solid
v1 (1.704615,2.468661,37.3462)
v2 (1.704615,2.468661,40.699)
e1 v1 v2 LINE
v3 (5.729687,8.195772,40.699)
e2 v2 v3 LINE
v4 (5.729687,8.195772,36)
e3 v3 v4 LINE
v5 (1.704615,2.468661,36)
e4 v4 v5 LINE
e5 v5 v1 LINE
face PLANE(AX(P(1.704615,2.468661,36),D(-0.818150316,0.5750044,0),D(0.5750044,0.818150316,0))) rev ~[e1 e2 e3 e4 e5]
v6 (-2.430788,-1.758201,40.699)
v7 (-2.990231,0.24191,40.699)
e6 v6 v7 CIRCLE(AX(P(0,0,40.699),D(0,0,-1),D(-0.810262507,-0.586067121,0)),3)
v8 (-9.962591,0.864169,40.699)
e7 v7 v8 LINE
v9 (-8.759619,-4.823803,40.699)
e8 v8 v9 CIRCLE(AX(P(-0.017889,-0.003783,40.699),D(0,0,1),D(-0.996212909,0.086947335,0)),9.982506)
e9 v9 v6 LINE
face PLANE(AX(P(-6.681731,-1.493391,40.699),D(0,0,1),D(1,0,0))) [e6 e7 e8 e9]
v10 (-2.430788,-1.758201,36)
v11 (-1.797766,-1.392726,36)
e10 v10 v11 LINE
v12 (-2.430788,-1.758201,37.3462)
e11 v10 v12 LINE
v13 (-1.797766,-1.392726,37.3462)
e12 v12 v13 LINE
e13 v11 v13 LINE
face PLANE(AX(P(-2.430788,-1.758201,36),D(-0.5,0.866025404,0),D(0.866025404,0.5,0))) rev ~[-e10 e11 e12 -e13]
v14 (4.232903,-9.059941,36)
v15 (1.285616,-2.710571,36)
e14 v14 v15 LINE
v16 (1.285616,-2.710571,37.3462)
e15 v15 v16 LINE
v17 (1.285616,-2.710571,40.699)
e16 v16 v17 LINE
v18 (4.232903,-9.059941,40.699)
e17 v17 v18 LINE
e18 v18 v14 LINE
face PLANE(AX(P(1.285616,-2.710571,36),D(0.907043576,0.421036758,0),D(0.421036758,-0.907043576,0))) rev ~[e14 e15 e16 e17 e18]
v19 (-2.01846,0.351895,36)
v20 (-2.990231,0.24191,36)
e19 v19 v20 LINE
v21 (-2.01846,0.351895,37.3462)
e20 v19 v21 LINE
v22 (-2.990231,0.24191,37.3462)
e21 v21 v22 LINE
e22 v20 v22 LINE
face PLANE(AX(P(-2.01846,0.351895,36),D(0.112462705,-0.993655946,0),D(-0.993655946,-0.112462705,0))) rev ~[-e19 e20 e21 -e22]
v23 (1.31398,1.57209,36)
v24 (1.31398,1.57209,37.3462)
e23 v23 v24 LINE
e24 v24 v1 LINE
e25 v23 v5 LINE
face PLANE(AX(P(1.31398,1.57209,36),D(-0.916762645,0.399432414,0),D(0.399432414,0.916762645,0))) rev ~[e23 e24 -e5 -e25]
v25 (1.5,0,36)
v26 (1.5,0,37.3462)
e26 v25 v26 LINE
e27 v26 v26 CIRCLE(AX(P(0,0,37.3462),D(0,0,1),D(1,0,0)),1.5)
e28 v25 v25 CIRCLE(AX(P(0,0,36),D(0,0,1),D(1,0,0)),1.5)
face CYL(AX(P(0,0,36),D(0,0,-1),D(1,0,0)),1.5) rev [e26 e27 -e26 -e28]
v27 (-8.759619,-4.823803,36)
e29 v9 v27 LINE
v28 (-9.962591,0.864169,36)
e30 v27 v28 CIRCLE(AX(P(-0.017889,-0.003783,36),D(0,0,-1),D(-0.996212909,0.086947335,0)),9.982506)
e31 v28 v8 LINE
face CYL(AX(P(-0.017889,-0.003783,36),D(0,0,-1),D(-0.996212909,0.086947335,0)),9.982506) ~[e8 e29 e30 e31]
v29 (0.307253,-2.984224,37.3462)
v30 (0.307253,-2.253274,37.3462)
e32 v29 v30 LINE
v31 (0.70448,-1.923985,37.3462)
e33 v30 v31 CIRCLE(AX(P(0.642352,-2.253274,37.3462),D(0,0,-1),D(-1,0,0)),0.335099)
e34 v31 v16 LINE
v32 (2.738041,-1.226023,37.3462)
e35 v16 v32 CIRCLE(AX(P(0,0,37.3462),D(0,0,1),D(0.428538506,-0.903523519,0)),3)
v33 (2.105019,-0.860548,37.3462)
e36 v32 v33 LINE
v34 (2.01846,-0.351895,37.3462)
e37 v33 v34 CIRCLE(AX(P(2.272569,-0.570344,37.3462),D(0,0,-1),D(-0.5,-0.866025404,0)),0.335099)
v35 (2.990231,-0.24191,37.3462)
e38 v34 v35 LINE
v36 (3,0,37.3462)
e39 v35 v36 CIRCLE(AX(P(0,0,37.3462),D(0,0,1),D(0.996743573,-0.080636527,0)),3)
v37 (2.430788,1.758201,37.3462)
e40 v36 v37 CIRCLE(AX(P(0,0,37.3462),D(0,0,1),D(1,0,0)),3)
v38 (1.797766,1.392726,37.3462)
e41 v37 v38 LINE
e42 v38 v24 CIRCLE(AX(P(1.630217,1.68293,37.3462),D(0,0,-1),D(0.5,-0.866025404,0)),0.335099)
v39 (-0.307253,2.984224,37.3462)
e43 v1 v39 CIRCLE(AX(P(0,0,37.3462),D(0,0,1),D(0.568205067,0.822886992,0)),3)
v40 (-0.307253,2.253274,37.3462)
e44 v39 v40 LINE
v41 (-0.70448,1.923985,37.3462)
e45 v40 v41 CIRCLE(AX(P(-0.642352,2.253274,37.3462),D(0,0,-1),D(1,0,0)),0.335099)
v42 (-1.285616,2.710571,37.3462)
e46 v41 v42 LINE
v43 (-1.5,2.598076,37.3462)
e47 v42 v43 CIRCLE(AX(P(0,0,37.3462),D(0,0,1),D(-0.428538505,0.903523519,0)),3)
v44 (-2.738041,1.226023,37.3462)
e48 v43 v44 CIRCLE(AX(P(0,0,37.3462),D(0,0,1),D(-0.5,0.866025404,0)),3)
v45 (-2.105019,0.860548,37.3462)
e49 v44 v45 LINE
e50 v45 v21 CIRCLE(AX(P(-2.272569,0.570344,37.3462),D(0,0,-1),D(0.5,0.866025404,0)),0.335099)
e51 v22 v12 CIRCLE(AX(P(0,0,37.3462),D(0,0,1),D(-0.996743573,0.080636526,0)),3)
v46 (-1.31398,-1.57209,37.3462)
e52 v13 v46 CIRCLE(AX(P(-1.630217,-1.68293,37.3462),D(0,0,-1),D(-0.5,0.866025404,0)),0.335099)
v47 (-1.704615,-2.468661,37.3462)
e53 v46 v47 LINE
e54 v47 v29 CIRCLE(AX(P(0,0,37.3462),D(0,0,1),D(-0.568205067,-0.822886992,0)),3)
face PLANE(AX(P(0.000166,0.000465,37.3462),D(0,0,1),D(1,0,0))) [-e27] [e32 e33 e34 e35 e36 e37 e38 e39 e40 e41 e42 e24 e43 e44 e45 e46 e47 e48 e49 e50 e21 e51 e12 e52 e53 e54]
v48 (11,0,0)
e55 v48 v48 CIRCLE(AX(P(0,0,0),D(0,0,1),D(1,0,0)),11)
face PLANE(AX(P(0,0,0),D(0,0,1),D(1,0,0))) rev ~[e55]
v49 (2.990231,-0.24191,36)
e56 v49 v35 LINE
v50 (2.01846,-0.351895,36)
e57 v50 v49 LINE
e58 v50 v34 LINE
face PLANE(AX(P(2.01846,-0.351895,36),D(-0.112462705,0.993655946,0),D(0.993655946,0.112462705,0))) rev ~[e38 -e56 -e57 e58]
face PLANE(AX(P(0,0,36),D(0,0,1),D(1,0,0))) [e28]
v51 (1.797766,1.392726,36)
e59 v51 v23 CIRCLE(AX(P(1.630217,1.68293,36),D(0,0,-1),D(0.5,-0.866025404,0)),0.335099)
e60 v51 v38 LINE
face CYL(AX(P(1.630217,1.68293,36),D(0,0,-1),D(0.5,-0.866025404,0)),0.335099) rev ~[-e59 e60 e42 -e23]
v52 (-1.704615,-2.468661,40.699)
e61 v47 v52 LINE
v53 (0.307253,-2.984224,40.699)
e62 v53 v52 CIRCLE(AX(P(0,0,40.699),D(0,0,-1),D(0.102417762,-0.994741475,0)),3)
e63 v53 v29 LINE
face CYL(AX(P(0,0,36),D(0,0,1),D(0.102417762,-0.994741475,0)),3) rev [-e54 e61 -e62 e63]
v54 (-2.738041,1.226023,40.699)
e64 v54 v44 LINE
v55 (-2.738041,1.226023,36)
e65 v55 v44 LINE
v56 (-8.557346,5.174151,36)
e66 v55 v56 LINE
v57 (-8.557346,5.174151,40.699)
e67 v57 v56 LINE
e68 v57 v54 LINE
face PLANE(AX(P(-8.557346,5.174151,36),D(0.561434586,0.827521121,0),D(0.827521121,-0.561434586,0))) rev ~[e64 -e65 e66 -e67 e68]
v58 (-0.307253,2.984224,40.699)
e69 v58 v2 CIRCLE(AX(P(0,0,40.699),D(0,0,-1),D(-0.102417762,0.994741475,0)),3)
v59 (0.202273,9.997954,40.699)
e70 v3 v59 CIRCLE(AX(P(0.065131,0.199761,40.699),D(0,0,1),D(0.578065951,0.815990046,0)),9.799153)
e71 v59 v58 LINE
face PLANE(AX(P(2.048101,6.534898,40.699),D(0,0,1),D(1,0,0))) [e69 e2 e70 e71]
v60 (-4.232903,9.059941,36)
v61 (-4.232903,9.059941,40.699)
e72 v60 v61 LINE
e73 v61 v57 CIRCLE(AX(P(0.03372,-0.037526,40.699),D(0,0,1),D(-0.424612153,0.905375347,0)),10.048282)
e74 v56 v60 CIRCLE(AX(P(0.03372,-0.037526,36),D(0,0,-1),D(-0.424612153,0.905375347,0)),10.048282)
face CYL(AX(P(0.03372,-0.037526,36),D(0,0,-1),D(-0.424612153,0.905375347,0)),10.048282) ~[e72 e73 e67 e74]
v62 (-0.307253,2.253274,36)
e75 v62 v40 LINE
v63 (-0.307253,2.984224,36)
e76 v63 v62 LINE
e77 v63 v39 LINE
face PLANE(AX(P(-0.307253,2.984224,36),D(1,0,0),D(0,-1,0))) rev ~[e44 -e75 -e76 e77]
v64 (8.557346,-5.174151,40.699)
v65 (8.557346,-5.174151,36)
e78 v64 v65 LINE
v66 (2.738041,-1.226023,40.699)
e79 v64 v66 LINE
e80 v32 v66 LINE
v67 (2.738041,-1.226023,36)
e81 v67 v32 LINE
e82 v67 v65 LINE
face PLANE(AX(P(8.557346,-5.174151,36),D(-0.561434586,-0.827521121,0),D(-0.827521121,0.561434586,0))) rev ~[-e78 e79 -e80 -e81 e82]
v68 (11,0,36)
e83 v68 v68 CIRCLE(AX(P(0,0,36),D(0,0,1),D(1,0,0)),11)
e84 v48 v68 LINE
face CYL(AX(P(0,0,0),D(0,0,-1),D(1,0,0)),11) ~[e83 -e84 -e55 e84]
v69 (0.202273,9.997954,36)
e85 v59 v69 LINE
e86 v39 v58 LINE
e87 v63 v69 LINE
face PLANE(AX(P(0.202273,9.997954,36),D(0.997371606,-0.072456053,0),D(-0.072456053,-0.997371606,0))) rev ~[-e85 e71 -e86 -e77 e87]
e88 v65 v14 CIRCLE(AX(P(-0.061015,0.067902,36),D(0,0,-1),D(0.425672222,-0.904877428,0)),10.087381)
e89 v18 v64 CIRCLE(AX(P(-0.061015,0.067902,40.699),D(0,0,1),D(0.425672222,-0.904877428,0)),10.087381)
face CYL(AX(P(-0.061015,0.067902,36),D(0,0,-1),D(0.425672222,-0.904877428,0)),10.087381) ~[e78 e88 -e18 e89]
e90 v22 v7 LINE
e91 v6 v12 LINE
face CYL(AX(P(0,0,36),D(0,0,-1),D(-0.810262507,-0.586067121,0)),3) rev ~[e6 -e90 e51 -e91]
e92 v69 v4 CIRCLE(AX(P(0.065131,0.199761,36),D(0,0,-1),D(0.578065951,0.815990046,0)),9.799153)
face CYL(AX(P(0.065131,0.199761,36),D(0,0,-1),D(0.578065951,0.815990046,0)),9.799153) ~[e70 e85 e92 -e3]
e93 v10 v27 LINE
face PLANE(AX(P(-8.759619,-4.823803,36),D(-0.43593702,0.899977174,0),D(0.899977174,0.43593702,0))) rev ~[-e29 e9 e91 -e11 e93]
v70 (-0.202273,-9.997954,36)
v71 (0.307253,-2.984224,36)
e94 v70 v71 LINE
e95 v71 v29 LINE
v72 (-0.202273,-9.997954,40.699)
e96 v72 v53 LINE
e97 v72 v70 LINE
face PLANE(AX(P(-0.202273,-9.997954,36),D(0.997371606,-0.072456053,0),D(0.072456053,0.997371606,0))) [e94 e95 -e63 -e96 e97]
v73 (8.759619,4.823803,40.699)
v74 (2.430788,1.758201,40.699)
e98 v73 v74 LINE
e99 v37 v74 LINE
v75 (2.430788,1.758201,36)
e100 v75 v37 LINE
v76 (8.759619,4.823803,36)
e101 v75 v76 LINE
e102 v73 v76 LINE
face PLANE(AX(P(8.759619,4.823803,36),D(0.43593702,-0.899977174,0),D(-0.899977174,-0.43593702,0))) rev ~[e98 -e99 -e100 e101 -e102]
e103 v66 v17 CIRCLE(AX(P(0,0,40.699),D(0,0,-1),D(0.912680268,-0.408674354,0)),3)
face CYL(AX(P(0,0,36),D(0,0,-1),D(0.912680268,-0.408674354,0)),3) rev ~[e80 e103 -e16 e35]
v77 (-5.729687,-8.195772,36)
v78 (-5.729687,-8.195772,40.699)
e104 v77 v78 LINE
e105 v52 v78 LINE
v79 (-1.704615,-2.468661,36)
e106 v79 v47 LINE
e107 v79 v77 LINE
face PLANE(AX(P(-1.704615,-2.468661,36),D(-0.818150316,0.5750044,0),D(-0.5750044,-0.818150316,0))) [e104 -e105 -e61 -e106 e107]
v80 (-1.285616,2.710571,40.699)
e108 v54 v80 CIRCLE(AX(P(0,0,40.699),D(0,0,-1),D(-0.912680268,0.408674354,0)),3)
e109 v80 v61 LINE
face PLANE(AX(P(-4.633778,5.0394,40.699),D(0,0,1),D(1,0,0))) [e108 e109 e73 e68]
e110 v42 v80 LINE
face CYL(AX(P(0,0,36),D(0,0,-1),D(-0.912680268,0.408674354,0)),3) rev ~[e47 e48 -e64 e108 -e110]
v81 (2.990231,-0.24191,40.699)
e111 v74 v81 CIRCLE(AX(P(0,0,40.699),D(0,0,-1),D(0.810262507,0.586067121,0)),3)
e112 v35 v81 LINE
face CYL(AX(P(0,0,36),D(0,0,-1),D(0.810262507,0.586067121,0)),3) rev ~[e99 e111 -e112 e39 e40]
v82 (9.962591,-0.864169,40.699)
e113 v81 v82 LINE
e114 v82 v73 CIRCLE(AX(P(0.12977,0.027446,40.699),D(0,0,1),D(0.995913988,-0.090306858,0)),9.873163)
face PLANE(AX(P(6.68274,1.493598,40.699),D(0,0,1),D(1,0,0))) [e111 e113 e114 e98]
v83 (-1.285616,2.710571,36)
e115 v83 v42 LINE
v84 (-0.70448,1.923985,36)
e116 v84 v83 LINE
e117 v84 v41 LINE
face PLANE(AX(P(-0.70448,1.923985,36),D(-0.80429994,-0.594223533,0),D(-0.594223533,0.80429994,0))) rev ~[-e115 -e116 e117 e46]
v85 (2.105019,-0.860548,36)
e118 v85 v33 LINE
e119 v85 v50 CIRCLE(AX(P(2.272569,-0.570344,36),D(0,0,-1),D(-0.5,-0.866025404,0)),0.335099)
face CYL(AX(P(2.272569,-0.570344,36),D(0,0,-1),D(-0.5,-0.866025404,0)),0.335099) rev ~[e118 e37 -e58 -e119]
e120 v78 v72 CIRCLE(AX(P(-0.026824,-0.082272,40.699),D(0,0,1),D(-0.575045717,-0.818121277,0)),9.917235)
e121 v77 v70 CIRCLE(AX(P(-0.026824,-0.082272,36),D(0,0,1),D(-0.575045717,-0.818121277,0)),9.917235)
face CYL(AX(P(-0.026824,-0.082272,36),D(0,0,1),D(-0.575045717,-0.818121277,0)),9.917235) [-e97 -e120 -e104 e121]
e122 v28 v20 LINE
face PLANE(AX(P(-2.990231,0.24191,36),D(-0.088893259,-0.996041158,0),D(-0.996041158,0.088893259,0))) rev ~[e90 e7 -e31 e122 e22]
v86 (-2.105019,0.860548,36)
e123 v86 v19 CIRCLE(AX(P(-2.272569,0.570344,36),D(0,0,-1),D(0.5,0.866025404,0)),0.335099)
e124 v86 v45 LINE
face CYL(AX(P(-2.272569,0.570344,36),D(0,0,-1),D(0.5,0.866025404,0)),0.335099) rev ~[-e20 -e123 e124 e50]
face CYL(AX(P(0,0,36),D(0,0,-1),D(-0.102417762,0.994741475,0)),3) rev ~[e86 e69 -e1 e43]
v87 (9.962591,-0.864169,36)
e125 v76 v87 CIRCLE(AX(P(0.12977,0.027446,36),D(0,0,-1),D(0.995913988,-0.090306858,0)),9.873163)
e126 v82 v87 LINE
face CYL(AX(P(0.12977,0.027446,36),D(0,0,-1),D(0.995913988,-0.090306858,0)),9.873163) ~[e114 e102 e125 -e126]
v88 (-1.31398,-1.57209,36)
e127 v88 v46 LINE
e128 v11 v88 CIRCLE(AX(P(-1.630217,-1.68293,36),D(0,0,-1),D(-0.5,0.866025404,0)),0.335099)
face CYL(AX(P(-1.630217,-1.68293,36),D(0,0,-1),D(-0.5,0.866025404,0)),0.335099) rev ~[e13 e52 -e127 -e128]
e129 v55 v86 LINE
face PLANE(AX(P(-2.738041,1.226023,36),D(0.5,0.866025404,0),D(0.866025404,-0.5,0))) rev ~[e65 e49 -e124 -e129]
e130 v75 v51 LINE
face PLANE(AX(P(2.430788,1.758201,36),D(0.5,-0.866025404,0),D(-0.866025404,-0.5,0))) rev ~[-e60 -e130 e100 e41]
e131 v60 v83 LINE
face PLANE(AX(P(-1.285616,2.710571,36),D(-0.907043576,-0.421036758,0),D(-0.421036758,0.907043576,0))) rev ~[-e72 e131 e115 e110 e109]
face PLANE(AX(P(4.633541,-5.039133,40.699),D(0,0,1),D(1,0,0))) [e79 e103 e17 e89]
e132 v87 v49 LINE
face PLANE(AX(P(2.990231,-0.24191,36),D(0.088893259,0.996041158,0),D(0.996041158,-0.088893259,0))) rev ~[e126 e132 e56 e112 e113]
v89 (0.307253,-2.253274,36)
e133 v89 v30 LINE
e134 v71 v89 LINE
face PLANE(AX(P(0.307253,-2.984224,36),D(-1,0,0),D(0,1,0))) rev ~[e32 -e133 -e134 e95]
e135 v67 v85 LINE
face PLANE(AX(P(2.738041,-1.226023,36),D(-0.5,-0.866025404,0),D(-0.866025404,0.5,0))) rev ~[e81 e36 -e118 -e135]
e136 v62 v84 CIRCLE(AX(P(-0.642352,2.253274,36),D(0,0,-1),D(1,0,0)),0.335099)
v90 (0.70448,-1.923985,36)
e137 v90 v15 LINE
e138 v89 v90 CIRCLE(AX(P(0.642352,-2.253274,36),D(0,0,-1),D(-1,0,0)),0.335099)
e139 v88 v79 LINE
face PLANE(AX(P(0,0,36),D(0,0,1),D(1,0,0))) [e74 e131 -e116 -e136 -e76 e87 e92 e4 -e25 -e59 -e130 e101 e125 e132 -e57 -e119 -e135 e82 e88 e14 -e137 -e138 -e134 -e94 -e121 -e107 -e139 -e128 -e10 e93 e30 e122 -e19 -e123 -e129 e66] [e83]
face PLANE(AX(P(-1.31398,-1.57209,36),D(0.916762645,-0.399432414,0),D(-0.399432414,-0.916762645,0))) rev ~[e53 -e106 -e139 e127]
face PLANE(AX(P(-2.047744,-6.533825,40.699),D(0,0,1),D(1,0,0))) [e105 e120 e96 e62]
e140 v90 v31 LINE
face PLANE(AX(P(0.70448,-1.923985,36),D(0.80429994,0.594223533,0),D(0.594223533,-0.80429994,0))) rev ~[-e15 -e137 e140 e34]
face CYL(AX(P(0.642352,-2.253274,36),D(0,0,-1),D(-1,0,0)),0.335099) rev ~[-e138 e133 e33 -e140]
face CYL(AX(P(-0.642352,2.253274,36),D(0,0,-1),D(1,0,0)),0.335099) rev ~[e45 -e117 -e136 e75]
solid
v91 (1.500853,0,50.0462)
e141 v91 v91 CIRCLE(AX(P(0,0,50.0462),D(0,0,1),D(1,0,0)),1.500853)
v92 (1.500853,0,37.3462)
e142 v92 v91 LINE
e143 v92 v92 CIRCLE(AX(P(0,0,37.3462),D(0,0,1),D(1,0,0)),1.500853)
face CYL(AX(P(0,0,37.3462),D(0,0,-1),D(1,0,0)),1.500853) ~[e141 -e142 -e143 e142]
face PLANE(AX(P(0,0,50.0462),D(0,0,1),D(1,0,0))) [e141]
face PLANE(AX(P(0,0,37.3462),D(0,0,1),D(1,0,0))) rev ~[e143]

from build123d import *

# Parameters (mm, degrees)
F0_R     = 11
F1_DEPTH = 36
F2_R     = 1.5
F3_DEPTH = 1.3462
F5_R     = 1.5008527343
F6_DEPTH = 12.7
F8_DEPTH = 4.699


with BuildPart() as f1:
    # F0 (on Top) → F1 (new body)
    with BuildSketch(Plane.XY):
        Circle(F0_R)
    extrude(amount=F1_DEPTH)

    # F2 (on face) → F3 (join)
    with BuildSketch(Plane.XY.offset(36)):
        with BuildLine():
            ThreePointArc((1.7046152007, 2.4686609766), (0.7447190731, 2.906095921), (-0.3072532854, 2.984224425))
            Line((-0.3072532854, 2.984224425), (-0.3072532854, 2.2532741809))
            ThreePointArc((-0.3072532854, 2.2532741809), (-0.4284919948, 1.9952916114), (-0.704479753, 1.9239853136))
            Line((-0.704479753, 1.9239853136), (-1.2856155187, 2.7105705558))
            ThreePointArc((-1.2856155187, 2.7105705558), (-1.3939430401, 2.6564869285), (-1.5, 2.5980762114))
            ThreePointArc((-1.5, 2.5980762114), (-2.2273032861, 2.009756222), (-2.7380408053, 1.2260230619))
            Line((-2.7380408053, 1.2260230619), (-2.105019325, 0.8605479398))
            ThreePointArc((-2.105019325, 0.8605479398), (-1.9422192208, 0.6265608529), (-2.0184600346, 0.3518952942))
            Line((-2.0184600346, 0.3518952942), (-2.9902307194, 0.2419095792))
            ThreePointArc((-2.9902307194, 0.2419095792), (-2.88911243, -0.8081023245), (-2.4307875199, -1.7582013631))
            Line((-2.4307875199, -1.7582013631), (-1.7977660396, -1.392726241))
            ThreePointArc((-1.7977660396, -1.392726241), (-1.513727226, -1.3687307585), (-1.3139802816, -1.5720900194))
            Line((-1.3139802816, -1.5720900194), (-1.7046152007, -2.4686609766))
            ThreePointArc((-1.7046152007, -2.4686609766), (-0.7447190731, -2.906095921), (0.3072532854, -2.984224425))
            Line((0.3072532854, -2.984224425), (0.3072532854, -2.2532741809))
            ThreePointArc((0.3072532854, -2.2532741809), (0.4284919948, -1.9952916114), (0.704479753, -1.9239853136))
            Line((0.704479753, -1.9239853136), (1.2856155187, -2.7105705558))
            ThreePointArc((1.2856155187, -2.7105705558), (2.1443933569, -2.0979935965), (2.7380408053, -1.2260230619))
            Line((2.7380408053, -1.2260230619), (2.105019325, -0.8605479398))
            ThreePointArc((2.105019325, -0.8605479398), (1.9422192208, -0.6265608529), (2.0184600346, -0.3518952942))
            Line((2.0184600346, -0.3518952942), (2.9902307194, -0.2419095792))
            ThreePointArc((2.9902307194, -0.2419095792), (2.9975566849, -0.1210533801), (3, 0))
            ThreePointArc((3, 0), (2.8541515867, 0.9240231167), (2.4307875199, 1.7582013631))
            Line((2.4307875199, 1.7582013631), (1.7977660396, 1.392726241))
            ThreePointArc((1.7977660396, 1.392726241), (1.513727226, 1.3687307585), (1.3139802816, 1.5720900194))
            Line((1.3139802816, 1.5720900194), (1.7046152007, 2.4686609766))
        make_face()
        Circle(F2_R, mode=Mode.SUBTRACT)
    extrude(amount=F3_DEPTH)

    # F7 (on face) → F8 (join, symmetric)
    with BuildSketch(Plane.XY.offset(36)):
        with BuildLine():
            ThreePointArc((-2.4307875199, -1.7582013631), (-2.88911243, -0.8081023245), (-2.9902307194, 0.2419095792))
            Line((-2.9902307194, 0.2419095792), (-9.9625906409, 0.8641688039))
            ThreePointArc((-9.9625906409, 0.8641688039), (-9.7843590309, -2.0693330281), (-8.7596187693, -4.8238033766))
            Line((-8.7596187693, -4.8238033766), (-2.4307875199, -1.7582013631))
        make_face()
        with BuildLine():
            Line((0.2022731176, 9.99795407), (-0.3072532854, 2.984224425))
            ThreePointArc((-0.3072532854, 2.984224425), (0.7447190731, 2.906095921), (1.7046152007, 2.4686609766))
            Line((1.7046152007, 2.4686609766), (5.7296874578, 8.1957721806))
            ThreePointArc((5.7296874578, 8.1957721806), (3.1027108725, 9.5162251218), (0.2022731176, 9.99795407))
        make_face()
        with BuildLine():
            Line((8.7596187693, 4.8238033766), (2.4307875199, 1.7582013631))
            ThreePointArc((2.4307875199, 1.7582013631), (2.88911243, 0.8081023245), (2.9902307194, -0.2419095792))
            Line((2.9902307194, -0.2419095792), (9.9625906409, -0.8641688039))
            ThreePointArc((9.9625906409, -0.8641688039), (9.7892625878, 2.0703701008), (8.7596187693, 4.8238033766))
        make_face()
        with BuildLine():
            Line((8.5573456517, -5.1741506934), (2.7380408053, -1.2260230619))
            ThreePointArc((2.7380408053, -1.2260230619), (2.1443933569, -2.0979935965), (1.2856155187, -2.7105705558))
            Line((1.2856155187, -2.7105705558), (4.2329031831, -9.0599409845))
            ThreePointArc((4.2329031831, -9.0599409845), (6.6811343516, -7.4353423534), (8.5573456517, -5.1741506934))
        make_face()
        with BuildLine():
            ThreePointArc((-2.7380408053, 1.2260230619), (-2.1443933569, 2.0979935965), (-1.2856155187, 2.7105705558))
            Line((-1.2856155187, 2.7105705558), (-4.2329031831, 9.0599409845))
            ThreePointArc((-4.2329031831, 9.0599409845), (-6.6822968499, 7.4366360818), (-8.5573456517, 5.1741506934))
            Line((-8.5573456517, 5.1741506934), (-2.7380408053, 1.2260230619))
        make_face()
        with BuildLine():
            ThreePointArc((0.3072532854, -2.984224425), (-0.7447190731, -2.906095921), (-1.7046152007, -2.4686609766))
            Line((-1.7046152007, -2.4686609766), (-5.7296874578, -8.1957721806))
            ThreePointArc((-5.7296874578, -8.1957721806), (-3.1010075693, -9.5110009752), (-0.2022731176, -9.99795407))
            Line((-0.2022731176, -9.99795407), (0.3072532854, -2.984224425))
        make_face()
    extrude(amount=F8_DEPTH, both=True)


with BuildPart() as f6:
    # F5 (on face) → F6 (new body)
    with BuildSketch(Plane.XY.offset(37.3462)):
        Circle(F5_R)
    extrude(amount=F6_DEPTH)


solid = Compound([f1.part, f6.part])
